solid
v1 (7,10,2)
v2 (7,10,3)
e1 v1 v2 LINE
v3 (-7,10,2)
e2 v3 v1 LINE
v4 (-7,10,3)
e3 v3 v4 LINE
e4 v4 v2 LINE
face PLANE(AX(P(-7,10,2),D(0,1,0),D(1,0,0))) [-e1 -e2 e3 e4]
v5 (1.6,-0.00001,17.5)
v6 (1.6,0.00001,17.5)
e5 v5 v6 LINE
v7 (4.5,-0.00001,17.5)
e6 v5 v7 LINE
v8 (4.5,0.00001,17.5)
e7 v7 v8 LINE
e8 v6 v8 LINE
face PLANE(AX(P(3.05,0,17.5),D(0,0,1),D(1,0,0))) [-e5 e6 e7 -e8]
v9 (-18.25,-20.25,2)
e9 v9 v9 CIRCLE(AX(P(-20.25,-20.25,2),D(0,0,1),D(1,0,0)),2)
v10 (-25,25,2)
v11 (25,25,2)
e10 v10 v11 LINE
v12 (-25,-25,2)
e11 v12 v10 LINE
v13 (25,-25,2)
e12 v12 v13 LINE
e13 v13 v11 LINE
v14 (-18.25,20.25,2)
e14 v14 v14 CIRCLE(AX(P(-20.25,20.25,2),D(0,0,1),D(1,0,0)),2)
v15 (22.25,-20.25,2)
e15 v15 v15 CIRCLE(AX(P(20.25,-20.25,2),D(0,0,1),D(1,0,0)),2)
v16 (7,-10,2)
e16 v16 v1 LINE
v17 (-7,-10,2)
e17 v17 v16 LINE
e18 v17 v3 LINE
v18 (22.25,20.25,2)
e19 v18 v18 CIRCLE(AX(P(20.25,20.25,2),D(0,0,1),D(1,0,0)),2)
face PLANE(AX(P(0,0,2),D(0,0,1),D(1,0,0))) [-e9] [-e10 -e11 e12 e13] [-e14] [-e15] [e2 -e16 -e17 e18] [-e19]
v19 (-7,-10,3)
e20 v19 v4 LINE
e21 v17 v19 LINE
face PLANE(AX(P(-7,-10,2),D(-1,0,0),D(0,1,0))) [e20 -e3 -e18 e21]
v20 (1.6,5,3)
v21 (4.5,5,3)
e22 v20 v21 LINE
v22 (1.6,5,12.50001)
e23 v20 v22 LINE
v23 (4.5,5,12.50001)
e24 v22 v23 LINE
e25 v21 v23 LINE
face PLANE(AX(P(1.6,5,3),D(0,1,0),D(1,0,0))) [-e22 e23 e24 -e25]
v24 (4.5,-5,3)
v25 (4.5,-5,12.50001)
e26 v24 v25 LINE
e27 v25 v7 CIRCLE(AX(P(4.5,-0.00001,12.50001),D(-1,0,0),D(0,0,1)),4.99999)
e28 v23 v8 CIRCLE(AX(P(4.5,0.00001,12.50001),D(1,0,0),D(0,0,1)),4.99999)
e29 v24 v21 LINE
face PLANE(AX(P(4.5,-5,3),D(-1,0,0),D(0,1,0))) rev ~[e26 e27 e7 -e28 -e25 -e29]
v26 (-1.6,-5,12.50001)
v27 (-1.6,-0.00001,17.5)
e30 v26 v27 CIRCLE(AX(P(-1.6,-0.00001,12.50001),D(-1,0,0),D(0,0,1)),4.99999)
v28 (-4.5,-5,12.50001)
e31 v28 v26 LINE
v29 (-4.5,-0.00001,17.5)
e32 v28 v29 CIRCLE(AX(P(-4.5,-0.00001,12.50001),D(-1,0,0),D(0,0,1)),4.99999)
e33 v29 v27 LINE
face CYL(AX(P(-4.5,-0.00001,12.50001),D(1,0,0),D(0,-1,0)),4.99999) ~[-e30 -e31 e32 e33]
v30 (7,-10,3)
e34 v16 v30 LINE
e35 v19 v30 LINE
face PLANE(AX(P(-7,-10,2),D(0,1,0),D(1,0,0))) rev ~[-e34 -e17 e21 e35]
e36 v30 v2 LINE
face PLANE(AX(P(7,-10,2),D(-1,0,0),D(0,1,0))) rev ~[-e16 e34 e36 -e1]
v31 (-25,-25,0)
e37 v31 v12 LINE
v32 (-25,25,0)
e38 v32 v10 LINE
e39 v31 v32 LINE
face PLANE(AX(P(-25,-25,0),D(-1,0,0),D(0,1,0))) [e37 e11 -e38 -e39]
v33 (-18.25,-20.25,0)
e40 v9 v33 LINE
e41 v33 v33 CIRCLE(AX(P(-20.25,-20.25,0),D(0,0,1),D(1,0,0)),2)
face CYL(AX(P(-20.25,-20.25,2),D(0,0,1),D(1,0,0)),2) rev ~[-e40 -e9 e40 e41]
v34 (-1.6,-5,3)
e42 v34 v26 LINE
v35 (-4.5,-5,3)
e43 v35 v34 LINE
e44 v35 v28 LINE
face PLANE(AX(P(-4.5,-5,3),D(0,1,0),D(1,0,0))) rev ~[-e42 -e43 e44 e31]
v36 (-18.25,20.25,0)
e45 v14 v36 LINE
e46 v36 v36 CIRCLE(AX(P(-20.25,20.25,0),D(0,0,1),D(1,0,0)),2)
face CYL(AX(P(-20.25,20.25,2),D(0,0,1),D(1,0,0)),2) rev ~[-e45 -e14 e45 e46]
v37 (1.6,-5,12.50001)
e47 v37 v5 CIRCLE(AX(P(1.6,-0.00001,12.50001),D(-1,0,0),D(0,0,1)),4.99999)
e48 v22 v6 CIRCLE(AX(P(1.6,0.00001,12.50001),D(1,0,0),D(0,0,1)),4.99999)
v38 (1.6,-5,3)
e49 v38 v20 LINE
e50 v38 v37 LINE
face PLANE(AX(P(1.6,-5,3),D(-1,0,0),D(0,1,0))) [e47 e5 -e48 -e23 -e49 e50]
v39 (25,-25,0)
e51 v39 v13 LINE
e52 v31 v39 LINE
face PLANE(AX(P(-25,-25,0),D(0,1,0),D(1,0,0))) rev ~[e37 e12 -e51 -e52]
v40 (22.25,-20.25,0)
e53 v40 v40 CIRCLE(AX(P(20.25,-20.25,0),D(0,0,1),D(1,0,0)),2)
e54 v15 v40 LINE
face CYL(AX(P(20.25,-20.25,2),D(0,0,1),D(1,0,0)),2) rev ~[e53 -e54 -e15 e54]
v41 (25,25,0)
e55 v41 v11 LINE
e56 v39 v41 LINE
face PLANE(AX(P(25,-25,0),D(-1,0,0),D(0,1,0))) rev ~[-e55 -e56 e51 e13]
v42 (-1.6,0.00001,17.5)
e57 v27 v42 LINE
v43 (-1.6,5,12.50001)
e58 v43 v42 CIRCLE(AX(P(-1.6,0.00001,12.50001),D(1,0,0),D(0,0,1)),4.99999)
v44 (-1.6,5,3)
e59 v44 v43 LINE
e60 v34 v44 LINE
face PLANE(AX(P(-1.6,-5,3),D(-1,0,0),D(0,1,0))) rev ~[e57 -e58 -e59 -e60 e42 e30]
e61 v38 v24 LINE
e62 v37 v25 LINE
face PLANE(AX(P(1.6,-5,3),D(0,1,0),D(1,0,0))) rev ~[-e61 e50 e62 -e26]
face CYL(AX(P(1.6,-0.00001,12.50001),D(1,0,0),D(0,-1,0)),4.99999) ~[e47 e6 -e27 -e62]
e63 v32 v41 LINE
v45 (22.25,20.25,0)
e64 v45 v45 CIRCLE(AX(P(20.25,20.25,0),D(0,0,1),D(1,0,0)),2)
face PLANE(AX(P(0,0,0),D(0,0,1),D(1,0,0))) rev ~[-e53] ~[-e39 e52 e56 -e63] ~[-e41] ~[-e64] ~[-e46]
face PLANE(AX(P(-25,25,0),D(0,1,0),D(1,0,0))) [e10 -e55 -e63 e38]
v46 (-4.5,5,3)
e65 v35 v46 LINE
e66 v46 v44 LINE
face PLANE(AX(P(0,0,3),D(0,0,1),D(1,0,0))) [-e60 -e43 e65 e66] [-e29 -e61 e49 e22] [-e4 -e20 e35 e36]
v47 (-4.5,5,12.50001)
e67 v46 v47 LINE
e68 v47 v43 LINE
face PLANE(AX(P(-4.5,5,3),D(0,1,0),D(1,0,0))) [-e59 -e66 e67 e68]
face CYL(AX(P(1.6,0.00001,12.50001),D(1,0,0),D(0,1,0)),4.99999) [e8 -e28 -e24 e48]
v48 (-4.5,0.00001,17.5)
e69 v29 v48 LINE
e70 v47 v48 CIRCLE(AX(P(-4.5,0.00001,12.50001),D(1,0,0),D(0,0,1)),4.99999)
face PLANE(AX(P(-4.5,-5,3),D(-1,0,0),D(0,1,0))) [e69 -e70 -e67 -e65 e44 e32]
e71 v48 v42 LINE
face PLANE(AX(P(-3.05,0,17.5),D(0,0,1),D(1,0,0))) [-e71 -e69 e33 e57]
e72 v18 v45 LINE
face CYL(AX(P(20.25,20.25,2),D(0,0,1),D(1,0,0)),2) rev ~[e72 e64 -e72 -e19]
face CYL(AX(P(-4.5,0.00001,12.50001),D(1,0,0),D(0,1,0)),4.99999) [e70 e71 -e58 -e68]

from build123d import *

# Parameters (mm, degrees)
F0_W     = 50
F0_H     = 50
F1_DEPTH = 2
F2_R     = 2
F3_DEPTH = 2
F4_W     = 14
F4_H     = 20
F5_DEPTH = 1
F6_W     = 2.9
F6_H     = 10
F7_DEPTH = 14.5
F8_R     = 4.99999


# Not quite as in the source:
# - a fillet or chamfer is up to 0.001 mm smaller than in the source, because OpenCascade refuses the exact size


with BuildPart() as f1:
    # F0 (on Top) → F1 (new body)
    with BuildSketch(Plane.XY):
        Rectangle(F0_W, F0_H)
    extrude(amount=F1_DEPTH)

    # F2 (on face) → F3 (cut)
    with BuildSketch(Plane.XY.offset(2)):
        with Locations((-20.25, 20.25)):
            Circle(F2_R)
        with Locations((20.25, 20.25)):
            Circle(F2_R)
        with Locations((20.25, -20.25)):
            Circle(F2_R)
        with Locations((-20.25, -20.25)):
            Circle(F2_R)
    extrude(amount=-F3_DEPTH, mode=Mode.SUBTRACT)

    # F4 (on face) → F5 (join)
    with BuildSketch(Plane.XY.offset(2)):
        Rectangle(F4_W, F4_H)
    extrude(amount=F5_DEPTH)

    # F6 (on face) → F7 (join)
    with BuildSketch(Plane.XY.offset(3)):
        with Locations((3.05, 0)):
            Rectangle(F6_W, F6_H)
        with Locations((-3.05, 0)):
            Rectangle(F6_W, F6_H)
    extrude(amount=F7_DEPTH)

    # F8 (radius 5 in the source; OpenCascade refuses exactly that, so slightly less here)
    f8_edges = [f1.edges().sort_by_distance(p)[0] for p in [
        (-3.05, 5, 17.5),
        (3.05, 5, 17.5),
        (3.05, -5, 17.5),
        (-3.05, -5, 17.5),
    ]]
    fillet(f8_edges, radius=F8_R)


solid = f1.part
